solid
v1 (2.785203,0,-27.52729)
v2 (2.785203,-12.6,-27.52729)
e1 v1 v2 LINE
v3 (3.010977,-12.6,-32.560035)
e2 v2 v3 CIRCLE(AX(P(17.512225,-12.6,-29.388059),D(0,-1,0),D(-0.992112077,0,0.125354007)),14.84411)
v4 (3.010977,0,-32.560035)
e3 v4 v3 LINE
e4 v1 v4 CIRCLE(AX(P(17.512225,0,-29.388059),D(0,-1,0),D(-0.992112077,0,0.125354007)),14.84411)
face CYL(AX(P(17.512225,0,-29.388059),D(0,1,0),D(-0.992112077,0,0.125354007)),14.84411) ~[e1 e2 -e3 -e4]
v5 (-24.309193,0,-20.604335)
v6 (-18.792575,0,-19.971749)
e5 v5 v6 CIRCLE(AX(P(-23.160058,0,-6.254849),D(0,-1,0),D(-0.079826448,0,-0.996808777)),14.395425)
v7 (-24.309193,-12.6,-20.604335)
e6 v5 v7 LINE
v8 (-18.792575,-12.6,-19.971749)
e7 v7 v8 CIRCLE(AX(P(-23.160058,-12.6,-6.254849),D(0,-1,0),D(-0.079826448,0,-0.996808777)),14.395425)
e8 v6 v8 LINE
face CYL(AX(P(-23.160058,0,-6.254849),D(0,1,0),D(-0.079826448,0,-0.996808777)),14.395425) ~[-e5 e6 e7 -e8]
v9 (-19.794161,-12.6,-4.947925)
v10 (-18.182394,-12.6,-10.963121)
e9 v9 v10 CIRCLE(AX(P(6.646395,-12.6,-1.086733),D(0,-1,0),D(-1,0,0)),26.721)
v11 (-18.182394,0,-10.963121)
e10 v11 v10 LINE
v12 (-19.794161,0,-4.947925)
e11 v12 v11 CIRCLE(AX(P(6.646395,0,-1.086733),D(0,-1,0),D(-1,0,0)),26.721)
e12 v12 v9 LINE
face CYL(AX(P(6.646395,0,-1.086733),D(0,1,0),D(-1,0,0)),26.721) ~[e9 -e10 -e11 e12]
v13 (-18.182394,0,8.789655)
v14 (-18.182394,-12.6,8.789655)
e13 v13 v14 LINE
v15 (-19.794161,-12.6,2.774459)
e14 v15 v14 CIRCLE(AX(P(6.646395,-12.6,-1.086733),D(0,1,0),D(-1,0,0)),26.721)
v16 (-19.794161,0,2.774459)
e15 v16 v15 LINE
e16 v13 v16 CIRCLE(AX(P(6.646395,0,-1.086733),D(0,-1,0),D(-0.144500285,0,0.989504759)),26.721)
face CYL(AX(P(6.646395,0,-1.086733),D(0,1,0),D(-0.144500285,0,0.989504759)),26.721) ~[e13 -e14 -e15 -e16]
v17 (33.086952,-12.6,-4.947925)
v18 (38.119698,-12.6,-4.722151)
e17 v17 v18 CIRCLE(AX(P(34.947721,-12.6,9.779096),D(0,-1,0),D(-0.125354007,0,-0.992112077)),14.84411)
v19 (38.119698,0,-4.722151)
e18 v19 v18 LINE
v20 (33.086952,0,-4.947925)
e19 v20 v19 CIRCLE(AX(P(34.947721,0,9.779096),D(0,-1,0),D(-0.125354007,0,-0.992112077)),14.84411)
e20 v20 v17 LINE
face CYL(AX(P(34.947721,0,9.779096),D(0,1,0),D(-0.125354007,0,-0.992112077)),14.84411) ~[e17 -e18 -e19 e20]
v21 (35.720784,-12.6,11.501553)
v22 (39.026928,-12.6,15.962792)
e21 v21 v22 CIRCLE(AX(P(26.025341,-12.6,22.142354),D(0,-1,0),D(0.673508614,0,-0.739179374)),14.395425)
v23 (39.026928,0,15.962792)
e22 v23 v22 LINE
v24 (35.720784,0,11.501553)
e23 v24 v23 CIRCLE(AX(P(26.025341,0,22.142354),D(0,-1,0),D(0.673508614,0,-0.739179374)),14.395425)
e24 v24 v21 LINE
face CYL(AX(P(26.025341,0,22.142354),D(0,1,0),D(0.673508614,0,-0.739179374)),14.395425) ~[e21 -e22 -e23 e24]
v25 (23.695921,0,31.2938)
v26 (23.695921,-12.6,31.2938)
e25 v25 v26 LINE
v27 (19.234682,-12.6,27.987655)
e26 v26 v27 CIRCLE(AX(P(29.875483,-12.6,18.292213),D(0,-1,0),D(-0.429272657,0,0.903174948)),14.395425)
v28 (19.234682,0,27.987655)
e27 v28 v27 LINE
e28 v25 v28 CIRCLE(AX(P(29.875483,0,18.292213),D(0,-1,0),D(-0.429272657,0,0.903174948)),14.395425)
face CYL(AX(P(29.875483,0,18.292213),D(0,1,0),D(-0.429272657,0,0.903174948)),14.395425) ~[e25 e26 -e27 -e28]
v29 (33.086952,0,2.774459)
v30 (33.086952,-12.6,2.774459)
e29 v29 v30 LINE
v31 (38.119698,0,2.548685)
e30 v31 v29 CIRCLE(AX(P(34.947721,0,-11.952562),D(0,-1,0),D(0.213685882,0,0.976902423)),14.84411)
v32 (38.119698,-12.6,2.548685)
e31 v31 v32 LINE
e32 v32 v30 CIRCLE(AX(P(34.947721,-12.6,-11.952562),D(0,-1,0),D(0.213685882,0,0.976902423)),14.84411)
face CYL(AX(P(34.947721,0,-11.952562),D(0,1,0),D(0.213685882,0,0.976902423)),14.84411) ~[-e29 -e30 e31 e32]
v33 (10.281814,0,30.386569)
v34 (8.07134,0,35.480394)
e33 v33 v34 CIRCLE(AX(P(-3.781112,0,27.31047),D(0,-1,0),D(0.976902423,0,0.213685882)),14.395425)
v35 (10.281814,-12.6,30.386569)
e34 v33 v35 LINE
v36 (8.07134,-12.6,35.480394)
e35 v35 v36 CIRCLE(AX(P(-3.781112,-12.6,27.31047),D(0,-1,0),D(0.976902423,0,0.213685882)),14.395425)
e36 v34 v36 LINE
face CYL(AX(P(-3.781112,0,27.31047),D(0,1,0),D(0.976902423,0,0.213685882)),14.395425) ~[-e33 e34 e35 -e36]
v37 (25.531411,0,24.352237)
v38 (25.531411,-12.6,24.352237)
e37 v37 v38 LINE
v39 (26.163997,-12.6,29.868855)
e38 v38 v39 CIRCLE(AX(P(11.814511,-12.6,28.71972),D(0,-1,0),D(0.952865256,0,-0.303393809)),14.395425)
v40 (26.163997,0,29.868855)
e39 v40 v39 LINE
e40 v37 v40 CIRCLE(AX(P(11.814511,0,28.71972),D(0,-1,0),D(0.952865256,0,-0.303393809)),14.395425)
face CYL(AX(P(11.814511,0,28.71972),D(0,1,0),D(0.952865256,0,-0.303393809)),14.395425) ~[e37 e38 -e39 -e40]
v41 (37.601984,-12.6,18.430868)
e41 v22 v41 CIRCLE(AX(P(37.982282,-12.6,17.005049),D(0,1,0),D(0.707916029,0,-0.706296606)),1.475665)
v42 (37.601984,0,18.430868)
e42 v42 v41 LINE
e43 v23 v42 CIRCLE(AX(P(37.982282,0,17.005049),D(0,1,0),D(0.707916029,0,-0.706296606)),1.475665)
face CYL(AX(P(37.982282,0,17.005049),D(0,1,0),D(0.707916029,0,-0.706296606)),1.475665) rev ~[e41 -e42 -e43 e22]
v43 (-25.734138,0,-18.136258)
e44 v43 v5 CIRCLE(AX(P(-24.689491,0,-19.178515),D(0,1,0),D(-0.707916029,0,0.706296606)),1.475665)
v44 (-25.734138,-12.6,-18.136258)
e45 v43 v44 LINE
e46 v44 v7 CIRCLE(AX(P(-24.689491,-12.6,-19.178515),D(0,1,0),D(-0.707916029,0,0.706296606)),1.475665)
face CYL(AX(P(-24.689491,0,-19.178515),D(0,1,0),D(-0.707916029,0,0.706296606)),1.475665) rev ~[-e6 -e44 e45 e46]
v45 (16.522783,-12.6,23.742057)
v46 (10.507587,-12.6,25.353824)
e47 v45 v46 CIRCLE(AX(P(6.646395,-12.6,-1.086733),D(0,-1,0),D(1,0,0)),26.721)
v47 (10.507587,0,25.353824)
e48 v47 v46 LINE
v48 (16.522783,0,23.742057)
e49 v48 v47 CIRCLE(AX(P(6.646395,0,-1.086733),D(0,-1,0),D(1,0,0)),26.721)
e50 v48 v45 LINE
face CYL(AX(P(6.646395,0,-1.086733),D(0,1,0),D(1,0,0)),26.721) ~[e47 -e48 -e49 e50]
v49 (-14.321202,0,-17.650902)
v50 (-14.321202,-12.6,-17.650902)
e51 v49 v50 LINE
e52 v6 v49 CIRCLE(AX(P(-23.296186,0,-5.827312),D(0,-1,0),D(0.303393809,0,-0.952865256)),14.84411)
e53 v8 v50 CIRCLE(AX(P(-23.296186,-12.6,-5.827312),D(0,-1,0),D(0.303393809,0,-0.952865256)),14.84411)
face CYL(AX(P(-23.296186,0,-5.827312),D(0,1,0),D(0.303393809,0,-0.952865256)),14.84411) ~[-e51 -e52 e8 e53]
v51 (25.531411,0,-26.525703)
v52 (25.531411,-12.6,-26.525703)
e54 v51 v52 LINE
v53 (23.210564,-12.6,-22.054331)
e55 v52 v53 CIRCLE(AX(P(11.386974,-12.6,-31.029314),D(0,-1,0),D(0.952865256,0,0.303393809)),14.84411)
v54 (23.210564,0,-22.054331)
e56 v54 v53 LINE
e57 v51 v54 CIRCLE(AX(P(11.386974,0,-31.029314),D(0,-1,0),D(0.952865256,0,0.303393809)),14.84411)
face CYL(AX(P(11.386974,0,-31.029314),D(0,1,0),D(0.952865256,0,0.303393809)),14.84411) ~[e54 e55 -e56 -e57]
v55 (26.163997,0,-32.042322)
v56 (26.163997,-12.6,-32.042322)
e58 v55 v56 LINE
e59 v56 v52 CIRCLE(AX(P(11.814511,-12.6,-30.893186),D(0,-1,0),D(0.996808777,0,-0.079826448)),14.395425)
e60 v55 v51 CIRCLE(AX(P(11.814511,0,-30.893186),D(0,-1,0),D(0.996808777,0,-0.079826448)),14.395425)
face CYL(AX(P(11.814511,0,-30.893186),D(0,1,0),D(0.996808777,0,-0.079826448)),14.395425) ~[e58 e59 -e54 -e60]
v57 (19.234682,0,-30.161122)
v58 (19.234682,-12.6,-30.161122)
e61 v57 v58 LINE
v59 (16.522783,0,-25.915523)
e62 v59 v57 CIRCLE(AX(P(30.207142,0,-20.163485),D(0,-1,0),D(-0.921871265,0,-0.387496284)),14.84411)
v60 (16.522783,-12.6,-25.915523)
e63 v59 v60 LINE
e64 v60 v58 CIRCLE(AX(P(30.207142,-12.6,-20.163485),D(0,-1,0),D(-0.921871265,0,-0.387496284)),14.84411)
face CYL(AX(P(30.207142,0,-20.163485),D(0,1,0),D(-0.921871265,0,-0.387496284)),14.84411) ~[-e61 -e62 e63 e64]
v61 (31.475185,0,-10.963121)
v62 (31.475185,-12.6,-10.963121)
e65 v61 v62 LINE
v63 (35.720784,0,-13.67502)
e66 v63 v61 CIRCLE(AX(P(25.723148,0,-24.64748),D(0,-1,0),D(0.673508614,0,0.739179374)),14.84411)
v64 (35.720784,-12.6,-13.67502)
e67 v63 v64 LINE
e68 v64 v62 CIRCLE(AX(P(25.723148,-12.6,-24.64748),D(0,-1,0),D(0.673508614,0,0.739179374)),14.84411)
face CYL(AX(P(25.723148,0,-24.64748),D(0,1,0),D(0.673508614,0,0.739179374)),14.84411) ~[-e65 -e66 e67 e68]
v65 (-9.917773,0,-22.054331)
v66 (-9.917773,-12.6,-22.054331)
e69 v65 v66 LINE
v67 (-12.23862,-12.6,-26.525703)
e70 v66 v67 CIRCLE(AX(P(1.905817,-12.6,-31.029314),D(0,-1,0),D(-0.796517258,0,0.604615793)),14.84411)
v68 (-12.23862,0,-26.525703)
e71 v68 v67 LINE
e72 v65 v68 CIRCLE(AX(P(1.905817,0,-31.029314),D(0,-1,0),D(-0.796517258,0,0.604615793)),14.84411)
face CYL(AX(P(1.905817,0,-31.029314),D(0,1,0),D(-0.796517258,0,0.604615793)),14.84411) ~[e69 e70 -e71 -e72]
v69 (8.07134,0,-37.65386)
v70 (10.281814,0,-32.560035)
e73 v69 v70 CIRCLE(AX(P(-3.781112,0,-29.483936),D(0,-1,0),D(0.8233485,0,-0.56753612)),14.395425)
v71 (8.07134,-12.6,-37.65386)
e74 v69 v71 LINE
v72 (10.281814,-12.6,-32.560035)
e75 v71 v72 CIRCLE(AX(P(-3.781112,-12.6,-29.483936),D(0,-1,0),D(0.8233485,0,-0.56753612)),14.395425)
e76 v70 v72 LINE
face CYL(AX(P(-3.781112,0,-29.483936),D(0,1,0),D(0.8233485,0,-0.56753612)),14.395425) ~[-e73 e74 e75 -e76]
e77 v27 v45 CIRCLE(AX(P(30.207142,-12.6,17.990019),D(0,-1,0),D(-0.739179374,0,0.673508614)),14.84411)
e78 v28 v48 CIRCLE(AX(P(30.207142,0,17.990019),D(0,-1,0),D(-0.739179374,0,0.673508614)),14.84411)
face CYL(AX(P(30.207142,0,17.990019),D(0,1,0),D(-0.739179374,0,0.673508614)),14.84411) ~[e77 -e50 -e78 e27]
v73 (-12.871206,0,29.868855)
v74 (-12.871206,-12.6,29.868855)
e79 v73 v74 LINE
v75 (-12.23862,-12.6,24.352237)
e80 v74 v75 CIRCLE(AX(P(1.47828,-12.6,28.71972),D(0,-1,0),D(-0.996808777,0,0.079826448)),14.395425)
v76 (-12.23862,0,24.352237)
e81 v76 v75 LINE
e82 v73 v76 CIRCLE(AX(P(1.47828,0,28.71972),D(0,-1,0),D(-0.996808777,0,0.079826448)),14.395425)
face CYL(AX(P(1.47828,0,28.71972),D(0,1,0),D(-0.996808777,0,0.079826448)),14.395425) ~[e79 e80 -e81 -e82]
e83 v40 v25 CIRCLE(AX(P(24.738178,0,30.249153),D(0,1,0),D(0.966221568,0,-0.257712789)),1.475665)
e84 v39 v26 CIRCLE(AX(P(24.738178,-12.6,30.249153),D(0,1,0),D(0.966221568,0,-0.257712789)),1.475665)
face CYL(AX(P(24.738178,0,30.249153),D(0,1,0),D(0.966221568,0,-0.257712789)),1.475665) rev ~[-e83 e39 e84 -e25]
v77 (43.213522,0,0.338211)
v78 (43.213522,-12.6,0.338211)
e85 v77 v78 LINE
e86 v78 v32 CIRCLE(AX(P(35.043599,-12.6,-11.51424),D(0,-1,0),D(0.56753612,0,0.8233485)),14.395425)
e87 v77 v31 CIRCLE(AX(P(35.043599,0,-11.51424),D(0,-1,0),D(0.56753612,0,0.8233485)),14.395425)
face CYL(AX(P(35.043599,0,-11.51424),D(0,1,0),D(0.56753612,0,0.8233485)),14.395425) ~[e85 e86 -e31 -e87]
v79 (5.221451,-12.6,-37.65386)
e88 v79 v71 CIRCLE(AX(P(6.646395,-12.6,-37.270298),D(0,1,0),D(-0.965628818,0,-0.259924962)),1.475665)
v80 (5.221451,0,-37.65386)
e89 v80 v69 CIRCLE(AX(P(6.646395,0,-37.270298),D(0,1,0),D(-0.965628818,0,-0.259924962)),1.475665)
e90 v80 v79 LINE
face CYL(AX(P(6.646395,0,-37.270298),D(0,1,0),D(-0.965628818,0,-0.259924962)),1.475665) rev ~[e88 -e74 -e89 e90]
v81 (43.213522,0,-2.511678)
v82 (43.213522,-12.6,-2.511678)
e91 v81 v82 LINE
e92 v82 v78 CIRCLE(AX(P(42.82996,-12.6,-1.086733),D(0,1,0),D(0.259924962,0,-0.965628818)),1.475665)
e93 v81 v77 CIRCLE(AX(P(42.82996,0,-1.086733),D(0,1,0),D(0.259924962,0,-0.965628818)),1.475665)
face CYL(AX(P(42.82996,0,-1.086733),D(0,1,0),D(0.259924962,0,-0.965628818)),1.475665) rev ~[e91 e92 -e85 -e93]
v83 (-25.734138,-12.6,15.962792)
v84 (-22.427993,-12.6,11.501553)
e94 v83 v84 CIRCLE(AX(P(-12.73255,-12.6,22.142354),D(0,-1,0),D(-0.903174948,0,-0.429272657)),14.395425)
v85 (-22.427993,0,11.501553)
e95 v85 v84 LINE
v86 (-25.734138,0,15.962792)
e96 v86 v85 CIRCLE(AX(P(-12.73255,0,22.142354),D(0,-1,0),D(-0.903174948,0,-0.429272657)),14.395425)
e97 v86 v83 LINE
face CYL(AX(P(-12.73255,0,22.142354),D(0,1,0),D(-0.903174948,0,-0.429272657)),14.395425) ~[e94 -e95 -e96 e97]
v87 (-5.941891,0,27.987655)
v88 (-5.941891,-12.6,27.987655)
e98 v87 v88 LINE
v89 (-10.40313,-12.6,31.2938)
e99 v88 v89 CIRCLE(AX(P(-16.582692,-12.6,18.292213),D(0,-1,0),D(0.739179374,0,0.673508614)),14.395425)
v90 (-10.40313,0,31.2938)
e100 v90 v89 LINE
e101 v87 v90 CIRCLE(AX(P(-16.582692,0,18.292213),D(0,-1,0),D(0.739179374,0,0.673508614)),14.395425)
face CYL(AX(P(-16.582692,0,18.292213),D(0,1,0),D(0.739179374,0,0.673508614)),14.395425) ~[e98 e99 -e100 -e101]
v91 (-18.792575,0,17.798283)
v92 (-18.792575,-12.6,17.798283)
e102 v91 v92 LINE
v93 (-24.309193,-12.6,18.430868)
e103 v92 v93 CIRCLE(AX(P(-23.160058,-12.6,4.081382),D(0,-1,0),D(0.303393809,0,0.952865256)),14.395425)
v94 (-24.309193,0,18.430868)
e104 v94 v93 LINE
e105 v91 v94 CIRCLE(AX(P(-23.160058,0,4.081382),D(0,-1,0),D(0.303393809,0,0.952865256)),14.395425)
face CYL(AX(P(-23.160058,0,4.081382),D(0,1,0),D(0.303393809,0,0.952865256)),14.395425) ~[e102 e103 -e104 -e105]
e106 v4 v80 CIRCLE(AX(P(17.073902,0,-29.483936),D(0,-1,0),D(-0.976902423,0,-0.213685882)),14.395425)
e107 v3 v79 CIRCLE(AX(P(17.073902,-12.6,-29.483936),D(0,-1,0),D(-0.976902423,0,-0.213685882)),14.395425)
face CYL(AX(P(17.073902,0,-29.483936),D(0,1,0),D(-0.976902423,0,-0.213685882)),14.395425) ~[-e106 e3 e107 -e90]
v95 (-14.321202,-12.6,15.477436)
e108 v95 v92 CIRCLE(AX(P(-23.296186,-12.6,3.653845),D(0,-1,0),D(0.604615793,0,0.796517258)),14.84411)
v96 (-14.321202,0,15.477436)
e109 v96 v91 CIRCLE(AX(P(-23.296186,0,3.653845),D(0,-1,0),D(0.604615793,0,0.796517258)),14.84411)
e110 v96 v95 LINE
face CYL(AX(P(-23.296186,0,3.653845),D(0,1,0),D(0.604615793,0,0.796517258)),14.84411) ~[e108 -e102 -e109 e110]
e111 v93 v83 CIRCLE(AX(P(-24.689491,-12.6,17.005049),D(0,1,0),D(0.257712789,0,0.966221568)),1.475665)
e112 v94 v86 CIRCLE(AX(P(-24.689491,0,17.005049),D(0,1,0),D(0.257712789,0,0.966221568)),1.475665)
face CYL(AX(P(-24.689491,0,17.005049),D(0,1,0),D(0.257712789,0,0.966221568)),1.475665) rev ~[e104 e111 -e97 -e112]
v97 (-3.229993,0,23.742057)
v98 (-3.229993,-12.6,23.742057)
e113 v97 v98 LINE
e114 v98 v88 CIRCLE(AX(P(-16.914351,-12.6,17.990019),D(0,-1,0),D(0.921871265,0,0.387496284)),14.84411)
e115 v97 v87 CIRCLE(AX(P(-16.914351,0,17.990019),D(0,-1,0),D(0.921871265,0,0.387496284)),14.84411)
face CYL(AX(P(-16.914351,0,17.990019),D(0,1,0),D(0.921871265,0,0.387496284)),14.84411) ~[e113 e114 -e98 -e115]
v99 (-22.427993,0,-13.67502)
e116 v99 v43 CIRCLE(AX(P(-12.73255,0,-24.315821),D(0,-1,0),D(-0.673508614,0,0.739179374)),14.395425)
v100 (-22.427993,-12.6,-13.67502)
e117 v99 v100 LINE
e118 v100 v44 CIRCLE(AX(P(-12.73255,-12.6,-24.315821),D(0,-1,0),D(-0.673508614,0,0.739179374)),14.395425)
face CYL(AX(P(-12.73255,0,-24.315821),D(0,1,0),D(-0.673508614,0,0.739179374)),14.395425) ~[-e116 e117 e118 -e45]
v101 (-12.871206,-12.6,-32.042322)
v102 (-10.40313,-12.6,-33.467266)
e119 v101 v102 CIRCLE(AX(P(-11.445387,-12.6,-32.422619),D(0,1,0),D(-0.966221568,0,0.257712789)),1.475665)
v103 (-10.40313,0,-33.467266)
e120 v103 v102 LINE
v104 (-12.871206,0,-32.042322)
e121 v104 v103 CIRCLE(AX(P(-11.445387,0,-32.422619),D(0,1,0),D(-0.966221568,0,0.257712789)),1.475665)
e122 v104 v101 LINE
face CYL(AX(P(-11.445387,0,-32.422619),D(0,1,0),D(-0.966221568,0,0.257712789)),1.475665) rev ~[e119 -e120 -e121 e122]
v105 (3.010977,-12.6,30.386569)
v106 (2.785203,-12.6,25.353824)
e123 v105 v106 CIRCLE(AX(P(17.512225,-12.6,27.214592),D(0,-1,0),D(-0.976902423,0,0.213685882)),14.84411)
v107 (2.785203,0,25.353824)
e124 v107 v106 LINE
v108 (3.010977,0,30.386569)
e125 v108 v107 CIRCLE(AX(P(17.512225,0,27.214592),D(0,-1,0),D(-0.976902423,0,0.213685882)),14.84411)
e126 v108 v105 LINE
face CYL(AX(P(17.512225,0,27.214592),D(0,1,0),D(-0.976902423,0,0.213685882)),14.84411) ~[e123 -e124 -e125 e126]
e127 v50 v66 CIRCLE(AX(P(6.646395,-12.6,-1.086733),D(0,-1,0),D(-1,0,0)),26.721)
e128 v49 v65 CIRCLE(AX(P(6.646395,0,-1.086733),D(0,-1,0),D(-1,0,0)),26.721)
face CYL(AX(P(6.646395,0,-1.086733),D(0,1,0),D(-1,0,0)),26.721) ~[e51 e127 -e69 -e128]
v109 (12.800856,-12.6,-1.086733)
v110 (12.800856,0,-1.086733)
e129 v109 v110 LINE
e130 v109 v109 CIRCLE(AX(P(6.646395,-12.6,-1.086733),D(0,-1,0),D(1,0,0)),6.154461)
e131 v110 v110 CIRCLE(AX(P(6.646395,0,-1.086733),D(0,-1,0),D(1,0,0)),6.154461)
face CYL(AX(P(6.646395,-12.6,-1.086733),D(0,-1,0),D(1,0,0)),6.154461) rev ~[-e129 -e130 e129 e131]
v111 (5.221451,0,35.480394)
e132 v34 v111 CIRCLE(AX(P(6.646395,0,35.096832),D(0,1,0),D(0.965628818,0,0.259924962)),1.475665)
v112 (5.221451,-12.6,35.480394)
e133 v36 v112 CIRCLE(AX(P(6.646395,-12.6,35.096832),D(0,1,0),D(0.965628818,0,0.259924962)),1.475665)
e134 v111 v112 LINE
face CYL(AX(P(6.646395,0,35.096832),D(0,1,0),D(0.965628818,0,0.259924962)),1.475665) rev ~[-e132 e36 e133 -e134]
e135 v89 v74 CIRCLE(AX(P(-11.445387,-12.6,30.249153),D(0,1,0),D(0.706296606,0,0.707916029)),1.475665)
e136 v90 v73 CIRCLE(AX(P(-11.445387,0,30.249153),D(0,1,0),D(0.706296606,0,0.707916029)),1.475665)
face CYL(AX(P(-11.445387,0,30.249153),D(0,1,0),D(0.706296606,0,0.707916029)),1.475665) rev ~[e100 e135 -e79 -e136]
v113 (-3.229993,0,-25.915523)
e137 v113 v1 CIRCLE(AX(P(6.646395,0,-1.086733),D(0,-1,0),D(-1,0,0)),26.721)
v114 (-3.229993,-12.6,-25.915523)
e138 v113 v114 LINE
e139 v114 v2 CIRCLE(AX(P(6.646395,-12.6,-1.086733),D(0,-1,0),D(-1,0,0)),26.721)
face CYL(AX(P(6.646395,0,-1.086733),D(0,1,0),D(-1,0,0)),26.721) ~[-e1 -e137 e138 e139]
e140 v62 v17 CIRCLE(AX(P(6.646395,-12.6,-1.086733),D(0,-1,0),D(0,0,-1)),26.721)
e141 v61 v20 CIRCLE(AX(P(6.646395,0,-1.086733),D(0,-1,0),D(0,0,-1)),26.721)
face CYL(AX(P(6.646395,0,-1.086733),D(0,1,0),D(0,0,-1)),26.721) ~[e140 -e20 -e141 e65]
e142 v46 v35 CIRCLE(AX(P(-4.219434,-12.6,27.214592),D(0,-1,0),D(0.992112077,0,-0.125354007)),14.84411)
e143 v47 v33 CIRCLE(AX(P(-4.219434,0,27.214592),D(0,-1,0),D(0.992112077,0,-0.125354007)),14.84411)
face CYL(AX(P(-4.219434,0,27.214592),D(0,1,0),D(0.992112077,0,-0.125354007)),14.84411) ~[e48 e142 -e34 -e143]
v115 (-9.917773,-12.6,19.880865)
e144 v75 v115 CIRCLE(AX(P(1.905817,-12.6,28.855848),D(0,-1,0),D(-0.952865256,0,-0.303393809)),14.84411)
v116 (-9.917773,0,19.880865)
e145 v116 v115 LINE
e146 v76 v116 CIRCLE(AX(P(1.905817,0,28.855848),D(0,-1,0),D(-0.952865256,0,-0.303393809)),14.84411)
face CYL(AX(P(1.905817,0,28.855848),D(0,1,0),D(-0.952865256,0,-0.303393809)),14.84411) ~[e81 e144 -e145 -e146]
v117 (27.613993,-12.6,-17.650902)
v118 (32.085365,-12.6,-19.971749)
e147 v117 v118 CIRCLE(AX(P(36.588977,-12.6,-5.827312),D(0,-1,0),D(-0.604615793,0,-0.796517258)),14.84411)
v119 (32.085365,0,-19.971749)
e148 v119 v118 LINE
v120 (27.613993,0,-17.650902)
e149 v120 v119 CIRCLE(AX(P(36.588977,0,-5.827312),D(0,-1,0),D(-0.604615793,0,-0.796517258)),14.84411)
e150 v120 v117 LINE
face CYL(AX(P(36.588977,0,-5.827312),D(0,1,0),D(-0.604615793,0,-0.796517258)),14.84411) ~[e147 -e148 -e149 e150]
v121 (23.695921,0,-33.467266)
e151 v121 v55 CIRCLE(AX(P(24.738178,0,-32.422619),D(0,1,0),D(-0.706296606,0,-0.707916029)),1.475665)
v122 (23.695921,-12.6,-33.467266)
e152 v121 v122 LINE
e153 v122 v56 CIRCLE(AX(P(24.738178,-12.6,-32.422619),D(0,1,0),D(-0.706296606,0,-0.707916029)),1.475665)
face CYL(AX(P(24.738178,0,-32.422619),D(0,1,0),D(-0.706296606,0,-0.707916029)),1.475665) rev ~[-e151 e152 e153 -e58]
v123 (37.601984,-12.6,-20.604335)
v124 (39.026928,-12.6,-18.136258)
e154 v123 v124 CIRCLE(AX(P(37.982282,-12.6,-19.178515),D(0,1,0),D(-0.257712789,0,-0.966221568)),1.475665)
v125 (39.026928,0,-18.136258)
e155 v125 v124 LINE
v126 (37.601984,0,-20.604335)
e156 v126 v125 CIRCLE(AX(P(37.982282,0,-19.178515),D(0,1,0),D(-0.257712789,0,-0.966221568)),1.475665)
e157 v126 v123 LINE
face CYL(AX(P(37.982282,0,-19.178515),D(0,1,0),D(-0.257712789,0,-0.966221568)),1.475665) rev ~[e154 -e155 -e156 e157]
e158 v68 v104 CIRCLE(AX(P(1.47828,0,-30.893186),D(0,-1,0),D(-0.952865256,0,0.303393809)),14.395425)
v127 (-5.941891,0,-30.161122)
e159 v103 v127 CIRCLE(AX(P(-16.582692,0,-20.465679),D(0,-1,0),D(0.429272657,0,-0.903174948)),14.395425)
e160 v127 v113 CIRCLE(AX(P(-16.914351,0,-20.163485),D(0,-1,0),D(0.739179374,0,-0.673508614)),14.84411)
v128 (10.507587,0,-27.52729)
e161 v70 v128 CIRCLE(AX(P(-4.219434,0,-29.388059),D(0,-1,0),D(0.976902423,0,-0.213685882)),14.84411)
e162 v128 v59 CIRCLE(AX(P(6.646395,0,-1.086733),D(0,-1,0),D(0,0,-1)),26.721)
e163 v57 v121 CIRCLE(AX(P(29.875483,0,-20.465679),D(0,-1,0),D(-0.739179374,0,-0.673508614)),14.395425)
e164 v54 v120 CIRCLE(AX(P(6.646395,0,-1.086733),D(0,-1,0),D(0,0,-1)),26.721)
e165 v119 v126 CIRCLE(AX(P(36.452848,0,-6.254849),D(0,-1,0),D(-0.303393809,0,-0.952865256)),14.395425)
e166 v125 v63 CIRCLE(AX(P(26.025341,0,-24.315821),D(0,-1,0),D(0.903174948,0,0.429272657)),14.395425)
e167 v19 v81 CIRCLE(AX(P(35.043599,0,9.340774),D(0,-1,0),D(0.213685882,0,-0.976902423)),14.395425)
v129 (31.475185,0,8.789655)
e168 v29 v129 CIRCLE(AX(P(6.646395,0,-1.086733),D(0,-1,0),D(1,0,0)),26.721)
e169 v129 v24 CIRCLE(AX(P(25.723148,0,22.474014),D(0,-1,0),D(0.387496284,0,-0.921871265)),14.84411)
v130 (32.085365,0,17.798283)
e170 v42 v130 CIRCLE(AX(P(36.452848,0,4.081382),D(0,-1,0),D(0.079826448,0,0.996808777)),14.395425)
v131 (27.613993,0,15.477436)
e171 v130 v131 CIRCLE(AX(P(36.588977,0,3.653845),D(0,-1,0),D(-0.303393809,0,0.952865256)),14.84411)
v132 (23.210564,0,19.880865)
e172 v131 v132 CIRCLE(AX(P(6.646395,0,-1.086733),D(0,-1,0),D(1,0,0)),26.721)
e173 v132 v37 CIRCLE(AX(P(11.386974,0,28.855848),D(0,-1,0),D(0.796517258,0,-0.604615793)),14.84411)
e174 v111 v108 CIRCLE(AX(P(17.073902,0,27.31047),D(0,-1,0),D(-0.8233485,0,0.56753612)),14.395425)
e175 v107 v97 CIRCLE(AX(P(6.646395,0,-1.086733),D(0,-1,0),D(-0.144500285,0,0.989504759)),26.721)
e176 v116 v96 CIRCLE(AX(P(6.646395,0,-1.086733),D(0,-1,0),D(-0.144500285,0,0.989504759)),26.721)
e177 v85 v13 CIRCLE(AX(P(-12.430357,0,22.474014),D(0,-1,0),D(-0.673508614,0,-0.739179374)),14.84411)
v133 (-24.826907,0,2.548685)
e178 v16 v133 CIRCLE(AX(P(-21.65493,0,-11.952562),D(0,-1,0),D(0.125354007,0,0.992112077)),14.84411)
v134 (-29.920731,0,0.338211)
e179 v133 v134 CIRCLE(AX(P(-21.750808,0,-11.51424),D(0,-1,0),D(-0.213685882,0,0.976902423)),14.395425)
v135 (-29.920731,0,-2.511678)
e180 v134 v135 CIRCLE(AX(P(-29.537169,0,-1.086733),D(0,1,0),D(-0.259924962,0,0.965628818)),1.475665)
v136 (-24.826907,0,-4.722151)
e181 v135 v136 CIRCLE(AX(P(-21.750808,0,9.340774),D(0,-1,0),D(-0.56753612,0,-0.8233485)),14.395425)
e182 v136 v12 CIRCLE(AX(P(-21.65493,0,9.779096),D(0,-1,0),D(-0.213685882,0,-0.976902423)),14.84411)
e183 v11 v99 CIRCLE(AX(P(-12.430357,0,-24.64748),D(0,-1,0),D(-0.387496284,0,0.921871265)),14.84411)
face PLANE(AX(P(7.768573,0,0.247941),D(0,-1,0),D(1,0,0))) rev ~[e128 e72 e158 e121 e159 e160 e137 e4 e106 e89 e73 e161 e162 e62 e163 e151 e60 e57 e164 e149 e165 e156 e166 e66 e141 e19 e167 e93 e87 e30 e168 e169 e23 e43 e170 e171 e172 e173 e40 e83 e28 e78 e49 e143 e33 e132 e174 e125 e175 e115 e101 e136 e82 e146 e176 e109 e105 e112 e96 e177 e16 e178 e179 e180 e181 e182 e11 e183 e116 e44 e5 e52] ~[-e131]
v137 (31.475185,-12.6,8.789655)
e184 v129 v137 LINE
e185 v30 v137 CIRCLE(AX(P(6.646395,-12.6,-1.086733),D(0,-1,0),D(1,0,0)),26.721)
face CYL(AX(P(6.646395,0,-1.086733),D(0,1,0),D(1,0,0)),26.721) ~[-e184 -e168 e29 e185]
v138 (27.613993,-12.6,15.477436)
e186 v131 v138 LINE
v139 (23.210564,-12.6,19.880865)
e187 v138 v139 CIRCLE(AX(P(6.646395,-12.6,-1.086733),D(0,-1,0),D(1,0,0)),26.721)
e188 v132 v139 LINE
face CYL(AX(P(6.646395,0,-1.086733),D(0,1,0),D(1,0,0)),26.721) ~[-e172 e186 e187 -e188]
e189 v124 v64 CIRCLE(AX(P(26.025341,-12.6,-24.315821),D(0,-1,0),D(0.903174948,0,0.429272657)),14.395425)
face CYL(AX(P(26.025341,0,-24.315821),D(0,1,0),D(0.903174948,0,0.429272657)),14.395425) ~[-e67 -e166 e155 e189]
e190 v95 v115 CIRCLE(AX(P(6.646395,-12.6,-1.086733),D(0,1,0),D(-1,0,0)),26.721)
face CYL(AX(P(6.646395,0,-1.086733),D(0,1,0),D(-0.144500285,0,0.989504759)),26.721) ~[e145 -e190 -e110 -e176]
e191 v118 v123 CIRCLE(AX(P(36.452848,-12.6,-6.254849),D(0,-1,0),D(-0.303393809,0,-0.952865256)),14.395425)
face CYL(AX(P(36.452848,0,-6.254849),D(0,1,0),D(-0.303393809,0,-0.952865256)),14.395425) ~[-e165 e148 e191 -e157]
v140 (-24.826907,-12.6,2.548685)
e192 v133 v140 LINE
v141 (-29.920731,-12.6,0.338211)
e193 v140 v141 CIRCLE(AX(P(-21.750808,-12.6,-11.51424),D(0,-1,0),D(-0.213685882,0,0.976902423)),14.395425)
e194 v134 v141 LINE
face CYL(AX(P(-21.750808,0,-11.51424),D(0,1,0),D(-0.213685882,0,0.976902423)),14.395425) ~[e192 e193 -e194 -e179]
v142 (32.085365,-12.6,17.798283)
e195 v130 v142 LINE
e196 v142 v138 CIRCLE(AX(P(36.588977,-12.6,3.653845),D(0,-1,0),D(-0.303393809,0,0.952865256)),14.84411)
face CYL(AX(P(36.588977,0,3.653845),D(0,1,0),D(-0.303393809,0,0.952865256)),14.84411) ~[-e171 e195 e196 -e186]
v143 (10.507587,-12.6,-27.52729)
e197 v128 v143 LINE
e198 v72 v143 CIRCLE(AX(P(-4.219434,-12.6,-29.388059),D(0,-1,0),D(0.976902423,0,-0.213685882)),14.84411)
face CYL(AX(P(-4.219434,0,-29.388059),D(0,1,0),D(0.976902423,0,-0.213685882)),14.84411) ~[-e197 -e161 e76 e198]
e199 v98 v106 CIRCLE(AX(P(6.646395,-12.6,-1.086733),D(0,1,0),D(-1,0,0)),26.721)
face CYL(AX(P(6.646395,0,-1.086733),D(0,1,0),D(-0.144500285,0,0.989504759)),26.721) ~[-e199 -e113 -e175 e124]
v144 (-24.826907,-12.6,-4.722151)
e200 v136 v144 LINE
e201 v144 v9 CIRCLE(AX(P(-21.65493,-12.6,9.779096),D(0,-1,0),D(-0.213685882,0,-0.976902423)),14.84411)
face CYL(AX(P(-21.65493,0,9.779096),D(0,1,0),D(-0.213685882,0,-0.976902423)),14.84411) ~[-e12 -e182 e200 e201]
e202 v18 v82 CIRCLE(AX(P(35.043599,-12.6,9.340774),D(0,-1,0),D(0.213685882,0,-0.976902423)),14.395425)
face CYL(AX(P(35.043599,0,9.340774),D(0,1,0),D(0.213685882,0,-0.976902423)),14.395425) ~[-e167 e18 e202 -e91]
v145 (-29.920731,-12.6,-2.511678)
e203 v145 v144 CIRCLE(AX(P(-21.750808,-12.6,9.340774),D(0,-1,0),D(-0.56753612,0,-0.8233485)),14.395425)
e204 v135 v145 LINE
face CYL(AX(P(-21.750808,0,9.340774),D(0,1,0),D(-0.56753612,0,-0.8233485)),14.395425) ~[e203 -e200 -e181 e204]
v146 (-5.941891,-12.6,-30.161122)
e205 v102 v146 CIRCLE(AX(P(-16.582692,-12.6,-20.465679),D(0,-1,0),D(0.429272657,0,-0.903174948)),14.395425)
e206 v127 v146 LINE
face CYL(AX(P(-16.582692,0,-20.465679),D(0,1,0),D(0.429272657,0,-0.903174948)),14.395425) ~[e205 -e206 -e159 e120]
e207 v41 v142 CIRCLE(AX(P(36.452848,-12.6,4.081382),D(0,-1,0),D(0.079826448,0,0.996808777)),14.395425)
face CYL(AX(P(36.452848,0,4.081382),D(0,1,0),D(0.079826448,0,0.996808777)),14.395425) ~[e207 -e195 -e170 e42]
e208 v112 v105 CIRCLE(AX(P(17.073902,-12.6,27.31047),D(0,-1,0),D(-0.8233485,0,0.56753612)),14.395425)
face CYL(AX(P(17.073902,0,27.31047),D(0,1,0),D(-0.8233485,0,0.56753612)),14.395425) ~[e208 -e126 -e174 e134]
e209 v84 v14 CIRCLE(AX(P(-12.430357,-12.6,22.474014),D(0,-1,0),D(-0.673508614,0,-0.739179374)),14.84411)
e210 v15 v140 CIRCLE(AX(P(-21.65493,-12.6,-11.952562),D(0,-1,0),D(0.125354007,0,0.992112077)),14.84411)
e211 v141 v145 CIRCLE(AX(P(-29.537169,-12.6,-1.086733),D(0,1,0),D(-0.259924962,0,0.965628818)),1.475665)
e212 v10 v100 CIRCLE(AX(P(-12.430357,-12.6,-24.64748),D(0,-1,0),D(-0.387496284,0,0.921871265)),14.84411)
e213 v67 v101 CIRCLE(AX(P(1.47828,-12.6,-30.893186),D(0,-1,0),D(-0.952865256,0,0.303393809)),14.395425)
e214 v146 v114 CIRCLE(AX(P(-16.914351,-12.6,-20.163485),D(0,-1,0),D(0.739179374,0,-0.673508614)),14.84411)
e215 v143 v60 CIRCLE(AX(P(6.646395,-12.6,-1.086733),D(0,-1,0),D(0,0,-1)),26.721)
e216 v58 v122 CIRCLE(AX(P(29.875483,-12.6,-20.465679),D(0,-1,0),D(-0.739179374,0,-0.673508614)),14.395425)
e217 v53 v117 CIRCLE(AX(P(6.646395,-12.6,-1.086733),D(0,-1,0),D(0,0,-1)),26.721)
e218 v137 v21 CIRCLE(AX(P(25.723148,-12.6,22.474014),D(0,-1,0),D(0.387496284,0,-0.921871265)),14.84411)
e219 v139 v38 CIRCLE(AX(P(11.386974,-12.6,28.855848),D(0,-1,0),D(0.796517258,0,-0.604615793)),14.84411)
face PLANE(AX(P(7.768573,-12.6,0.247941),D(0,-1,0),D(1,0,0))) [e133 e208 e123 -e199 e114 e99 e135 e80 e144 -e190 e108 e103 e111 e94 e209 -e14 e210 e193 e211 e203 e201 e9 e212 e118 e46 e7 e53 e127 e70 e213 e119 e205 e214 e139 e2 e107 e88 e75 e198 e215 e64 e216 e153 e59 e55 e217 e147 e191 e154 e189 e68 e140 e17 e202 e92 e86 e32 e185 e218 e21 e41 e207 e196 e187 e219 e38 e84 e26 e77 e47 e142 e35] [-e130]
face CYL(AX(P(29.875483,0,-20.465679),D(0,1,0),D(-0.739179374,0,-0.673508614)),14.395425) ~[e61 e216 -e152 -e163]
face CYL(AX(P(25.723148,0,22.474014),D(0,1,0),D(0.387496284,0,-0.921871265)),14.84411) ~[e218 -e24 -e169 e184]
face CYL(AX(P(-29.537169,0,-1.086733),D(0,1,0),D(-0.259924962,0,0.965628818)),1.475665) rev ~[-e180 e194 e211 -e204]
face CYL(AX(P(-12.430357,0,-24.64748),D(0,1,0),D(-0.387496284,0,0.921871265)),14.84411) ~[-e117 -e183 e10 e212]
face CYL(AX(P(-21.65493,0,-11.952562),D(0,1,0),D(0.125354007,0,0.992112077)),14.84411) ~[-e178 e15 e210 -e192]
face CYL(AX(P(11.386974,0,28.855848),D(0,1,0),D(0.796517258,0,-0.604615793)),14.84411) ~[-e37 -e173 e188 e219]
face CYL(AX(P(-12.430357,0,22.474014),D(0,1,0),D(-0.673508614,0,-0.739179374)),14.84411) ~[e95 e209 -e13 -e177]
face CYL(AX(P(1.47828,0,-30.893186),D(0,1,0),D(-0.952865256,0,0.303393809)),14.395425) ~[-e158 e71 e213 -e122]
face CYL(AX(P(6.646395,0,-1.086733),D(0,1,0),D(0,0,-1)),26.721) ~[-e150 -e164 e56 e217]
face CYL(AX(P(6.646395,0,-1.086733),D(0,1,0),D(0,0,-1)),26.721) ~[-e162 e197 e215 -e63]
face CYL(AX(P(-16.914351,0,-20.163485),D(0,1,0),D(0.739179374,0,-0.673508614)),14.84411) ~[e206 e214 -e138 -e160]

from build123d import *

# Parameters (mm, degrees)
F1_DEPTH = 12.6
F2_COUNT = 12
F3_R     = 6.1544610685
F4_DEPTH = 25


with BuildPart() as f1:
    # F0 (on Front) → F1 (new body)
    with BuildSketch(Plane.XZ):
        with BuildLine():
            ThreePointArc((2.7852032442, 25.3538235305), (-10.8298302985, -21.3004259569), (33.3673953593, -1.0867331287))
            ThreePointArc((33.3673953593, -1.0867331287), (26.8600881876, 16.3894925292), (10.5075874745, 25.3538235305))
            ThreePointArc((10.5075874745, 25.3538235305), (8.9226743944, 25.5371357629), (7.3296460588, 25.6255301502))
            ThreePointArc((7.3296460588, 25.6255301502), (5.0516276545, 25.5866348058), (2.7852032442, 25.3538235305))
        make_face()
        with BuildLine():
            ThreePointArc((7.3296460588, 25.6255301502), (8.9226743944, 25.5371357629), (10.5075874745, 25.3538235305))
            ThreePointArc((10.5075874745, 25.3538235305), (10.6097622585, 27.8798441888), (10.28181369, 30.3865691018))
            ThreePointArc((10.28181369, 30.3865691018), (9.4245102455, 33.0410725411), (8.0713397316, 35.4803936077))
            ThreePointArc((8.0713397316, 35.4803936077), (6.6463953593, 33.6211668014), (5.2214509871, 35.4803936077))
            ThreePointArc((5.2214509871, 35.4803936077), (3.8682804732, 33.0410725411), (3.0109770287, 30.3865691018))
            ThreePointArc((3.0109770287, 30.3865691018), (2.6830284602, 27.8798441888), (2.7852032442, 25.3538235305))
            ThreePointArc((2.7852032442, 25.3538235305), (5.0516276545, 25.5866348058), (7.3296460588, 25.6255301502))
        make_face()
    extrude(amount=F1_DEPTH)

    # F2: F1 ×12 about axis
    f2_axis = Axis((6.6463953593, 0, -1.0867331287), (0, 1, 0))


with BuildPart() as f1_1:
    add(f1.part)
    for i in range(1, F2_COUNT):
        add(f1.part.rotate(f2_axis, i * 360 / F2_COUNT))

    # F3 (on face) → F4 (cut)
    with BuildSketch(Plane.XZ.offset(12.6)):
        with Locations((6.6463953593, -1.0867331287)):
            Circle(F3_R)
    extrude(amount=-F4_DEPTH, mode=Mode.SUBTRACT)


solid = f1_1.part
